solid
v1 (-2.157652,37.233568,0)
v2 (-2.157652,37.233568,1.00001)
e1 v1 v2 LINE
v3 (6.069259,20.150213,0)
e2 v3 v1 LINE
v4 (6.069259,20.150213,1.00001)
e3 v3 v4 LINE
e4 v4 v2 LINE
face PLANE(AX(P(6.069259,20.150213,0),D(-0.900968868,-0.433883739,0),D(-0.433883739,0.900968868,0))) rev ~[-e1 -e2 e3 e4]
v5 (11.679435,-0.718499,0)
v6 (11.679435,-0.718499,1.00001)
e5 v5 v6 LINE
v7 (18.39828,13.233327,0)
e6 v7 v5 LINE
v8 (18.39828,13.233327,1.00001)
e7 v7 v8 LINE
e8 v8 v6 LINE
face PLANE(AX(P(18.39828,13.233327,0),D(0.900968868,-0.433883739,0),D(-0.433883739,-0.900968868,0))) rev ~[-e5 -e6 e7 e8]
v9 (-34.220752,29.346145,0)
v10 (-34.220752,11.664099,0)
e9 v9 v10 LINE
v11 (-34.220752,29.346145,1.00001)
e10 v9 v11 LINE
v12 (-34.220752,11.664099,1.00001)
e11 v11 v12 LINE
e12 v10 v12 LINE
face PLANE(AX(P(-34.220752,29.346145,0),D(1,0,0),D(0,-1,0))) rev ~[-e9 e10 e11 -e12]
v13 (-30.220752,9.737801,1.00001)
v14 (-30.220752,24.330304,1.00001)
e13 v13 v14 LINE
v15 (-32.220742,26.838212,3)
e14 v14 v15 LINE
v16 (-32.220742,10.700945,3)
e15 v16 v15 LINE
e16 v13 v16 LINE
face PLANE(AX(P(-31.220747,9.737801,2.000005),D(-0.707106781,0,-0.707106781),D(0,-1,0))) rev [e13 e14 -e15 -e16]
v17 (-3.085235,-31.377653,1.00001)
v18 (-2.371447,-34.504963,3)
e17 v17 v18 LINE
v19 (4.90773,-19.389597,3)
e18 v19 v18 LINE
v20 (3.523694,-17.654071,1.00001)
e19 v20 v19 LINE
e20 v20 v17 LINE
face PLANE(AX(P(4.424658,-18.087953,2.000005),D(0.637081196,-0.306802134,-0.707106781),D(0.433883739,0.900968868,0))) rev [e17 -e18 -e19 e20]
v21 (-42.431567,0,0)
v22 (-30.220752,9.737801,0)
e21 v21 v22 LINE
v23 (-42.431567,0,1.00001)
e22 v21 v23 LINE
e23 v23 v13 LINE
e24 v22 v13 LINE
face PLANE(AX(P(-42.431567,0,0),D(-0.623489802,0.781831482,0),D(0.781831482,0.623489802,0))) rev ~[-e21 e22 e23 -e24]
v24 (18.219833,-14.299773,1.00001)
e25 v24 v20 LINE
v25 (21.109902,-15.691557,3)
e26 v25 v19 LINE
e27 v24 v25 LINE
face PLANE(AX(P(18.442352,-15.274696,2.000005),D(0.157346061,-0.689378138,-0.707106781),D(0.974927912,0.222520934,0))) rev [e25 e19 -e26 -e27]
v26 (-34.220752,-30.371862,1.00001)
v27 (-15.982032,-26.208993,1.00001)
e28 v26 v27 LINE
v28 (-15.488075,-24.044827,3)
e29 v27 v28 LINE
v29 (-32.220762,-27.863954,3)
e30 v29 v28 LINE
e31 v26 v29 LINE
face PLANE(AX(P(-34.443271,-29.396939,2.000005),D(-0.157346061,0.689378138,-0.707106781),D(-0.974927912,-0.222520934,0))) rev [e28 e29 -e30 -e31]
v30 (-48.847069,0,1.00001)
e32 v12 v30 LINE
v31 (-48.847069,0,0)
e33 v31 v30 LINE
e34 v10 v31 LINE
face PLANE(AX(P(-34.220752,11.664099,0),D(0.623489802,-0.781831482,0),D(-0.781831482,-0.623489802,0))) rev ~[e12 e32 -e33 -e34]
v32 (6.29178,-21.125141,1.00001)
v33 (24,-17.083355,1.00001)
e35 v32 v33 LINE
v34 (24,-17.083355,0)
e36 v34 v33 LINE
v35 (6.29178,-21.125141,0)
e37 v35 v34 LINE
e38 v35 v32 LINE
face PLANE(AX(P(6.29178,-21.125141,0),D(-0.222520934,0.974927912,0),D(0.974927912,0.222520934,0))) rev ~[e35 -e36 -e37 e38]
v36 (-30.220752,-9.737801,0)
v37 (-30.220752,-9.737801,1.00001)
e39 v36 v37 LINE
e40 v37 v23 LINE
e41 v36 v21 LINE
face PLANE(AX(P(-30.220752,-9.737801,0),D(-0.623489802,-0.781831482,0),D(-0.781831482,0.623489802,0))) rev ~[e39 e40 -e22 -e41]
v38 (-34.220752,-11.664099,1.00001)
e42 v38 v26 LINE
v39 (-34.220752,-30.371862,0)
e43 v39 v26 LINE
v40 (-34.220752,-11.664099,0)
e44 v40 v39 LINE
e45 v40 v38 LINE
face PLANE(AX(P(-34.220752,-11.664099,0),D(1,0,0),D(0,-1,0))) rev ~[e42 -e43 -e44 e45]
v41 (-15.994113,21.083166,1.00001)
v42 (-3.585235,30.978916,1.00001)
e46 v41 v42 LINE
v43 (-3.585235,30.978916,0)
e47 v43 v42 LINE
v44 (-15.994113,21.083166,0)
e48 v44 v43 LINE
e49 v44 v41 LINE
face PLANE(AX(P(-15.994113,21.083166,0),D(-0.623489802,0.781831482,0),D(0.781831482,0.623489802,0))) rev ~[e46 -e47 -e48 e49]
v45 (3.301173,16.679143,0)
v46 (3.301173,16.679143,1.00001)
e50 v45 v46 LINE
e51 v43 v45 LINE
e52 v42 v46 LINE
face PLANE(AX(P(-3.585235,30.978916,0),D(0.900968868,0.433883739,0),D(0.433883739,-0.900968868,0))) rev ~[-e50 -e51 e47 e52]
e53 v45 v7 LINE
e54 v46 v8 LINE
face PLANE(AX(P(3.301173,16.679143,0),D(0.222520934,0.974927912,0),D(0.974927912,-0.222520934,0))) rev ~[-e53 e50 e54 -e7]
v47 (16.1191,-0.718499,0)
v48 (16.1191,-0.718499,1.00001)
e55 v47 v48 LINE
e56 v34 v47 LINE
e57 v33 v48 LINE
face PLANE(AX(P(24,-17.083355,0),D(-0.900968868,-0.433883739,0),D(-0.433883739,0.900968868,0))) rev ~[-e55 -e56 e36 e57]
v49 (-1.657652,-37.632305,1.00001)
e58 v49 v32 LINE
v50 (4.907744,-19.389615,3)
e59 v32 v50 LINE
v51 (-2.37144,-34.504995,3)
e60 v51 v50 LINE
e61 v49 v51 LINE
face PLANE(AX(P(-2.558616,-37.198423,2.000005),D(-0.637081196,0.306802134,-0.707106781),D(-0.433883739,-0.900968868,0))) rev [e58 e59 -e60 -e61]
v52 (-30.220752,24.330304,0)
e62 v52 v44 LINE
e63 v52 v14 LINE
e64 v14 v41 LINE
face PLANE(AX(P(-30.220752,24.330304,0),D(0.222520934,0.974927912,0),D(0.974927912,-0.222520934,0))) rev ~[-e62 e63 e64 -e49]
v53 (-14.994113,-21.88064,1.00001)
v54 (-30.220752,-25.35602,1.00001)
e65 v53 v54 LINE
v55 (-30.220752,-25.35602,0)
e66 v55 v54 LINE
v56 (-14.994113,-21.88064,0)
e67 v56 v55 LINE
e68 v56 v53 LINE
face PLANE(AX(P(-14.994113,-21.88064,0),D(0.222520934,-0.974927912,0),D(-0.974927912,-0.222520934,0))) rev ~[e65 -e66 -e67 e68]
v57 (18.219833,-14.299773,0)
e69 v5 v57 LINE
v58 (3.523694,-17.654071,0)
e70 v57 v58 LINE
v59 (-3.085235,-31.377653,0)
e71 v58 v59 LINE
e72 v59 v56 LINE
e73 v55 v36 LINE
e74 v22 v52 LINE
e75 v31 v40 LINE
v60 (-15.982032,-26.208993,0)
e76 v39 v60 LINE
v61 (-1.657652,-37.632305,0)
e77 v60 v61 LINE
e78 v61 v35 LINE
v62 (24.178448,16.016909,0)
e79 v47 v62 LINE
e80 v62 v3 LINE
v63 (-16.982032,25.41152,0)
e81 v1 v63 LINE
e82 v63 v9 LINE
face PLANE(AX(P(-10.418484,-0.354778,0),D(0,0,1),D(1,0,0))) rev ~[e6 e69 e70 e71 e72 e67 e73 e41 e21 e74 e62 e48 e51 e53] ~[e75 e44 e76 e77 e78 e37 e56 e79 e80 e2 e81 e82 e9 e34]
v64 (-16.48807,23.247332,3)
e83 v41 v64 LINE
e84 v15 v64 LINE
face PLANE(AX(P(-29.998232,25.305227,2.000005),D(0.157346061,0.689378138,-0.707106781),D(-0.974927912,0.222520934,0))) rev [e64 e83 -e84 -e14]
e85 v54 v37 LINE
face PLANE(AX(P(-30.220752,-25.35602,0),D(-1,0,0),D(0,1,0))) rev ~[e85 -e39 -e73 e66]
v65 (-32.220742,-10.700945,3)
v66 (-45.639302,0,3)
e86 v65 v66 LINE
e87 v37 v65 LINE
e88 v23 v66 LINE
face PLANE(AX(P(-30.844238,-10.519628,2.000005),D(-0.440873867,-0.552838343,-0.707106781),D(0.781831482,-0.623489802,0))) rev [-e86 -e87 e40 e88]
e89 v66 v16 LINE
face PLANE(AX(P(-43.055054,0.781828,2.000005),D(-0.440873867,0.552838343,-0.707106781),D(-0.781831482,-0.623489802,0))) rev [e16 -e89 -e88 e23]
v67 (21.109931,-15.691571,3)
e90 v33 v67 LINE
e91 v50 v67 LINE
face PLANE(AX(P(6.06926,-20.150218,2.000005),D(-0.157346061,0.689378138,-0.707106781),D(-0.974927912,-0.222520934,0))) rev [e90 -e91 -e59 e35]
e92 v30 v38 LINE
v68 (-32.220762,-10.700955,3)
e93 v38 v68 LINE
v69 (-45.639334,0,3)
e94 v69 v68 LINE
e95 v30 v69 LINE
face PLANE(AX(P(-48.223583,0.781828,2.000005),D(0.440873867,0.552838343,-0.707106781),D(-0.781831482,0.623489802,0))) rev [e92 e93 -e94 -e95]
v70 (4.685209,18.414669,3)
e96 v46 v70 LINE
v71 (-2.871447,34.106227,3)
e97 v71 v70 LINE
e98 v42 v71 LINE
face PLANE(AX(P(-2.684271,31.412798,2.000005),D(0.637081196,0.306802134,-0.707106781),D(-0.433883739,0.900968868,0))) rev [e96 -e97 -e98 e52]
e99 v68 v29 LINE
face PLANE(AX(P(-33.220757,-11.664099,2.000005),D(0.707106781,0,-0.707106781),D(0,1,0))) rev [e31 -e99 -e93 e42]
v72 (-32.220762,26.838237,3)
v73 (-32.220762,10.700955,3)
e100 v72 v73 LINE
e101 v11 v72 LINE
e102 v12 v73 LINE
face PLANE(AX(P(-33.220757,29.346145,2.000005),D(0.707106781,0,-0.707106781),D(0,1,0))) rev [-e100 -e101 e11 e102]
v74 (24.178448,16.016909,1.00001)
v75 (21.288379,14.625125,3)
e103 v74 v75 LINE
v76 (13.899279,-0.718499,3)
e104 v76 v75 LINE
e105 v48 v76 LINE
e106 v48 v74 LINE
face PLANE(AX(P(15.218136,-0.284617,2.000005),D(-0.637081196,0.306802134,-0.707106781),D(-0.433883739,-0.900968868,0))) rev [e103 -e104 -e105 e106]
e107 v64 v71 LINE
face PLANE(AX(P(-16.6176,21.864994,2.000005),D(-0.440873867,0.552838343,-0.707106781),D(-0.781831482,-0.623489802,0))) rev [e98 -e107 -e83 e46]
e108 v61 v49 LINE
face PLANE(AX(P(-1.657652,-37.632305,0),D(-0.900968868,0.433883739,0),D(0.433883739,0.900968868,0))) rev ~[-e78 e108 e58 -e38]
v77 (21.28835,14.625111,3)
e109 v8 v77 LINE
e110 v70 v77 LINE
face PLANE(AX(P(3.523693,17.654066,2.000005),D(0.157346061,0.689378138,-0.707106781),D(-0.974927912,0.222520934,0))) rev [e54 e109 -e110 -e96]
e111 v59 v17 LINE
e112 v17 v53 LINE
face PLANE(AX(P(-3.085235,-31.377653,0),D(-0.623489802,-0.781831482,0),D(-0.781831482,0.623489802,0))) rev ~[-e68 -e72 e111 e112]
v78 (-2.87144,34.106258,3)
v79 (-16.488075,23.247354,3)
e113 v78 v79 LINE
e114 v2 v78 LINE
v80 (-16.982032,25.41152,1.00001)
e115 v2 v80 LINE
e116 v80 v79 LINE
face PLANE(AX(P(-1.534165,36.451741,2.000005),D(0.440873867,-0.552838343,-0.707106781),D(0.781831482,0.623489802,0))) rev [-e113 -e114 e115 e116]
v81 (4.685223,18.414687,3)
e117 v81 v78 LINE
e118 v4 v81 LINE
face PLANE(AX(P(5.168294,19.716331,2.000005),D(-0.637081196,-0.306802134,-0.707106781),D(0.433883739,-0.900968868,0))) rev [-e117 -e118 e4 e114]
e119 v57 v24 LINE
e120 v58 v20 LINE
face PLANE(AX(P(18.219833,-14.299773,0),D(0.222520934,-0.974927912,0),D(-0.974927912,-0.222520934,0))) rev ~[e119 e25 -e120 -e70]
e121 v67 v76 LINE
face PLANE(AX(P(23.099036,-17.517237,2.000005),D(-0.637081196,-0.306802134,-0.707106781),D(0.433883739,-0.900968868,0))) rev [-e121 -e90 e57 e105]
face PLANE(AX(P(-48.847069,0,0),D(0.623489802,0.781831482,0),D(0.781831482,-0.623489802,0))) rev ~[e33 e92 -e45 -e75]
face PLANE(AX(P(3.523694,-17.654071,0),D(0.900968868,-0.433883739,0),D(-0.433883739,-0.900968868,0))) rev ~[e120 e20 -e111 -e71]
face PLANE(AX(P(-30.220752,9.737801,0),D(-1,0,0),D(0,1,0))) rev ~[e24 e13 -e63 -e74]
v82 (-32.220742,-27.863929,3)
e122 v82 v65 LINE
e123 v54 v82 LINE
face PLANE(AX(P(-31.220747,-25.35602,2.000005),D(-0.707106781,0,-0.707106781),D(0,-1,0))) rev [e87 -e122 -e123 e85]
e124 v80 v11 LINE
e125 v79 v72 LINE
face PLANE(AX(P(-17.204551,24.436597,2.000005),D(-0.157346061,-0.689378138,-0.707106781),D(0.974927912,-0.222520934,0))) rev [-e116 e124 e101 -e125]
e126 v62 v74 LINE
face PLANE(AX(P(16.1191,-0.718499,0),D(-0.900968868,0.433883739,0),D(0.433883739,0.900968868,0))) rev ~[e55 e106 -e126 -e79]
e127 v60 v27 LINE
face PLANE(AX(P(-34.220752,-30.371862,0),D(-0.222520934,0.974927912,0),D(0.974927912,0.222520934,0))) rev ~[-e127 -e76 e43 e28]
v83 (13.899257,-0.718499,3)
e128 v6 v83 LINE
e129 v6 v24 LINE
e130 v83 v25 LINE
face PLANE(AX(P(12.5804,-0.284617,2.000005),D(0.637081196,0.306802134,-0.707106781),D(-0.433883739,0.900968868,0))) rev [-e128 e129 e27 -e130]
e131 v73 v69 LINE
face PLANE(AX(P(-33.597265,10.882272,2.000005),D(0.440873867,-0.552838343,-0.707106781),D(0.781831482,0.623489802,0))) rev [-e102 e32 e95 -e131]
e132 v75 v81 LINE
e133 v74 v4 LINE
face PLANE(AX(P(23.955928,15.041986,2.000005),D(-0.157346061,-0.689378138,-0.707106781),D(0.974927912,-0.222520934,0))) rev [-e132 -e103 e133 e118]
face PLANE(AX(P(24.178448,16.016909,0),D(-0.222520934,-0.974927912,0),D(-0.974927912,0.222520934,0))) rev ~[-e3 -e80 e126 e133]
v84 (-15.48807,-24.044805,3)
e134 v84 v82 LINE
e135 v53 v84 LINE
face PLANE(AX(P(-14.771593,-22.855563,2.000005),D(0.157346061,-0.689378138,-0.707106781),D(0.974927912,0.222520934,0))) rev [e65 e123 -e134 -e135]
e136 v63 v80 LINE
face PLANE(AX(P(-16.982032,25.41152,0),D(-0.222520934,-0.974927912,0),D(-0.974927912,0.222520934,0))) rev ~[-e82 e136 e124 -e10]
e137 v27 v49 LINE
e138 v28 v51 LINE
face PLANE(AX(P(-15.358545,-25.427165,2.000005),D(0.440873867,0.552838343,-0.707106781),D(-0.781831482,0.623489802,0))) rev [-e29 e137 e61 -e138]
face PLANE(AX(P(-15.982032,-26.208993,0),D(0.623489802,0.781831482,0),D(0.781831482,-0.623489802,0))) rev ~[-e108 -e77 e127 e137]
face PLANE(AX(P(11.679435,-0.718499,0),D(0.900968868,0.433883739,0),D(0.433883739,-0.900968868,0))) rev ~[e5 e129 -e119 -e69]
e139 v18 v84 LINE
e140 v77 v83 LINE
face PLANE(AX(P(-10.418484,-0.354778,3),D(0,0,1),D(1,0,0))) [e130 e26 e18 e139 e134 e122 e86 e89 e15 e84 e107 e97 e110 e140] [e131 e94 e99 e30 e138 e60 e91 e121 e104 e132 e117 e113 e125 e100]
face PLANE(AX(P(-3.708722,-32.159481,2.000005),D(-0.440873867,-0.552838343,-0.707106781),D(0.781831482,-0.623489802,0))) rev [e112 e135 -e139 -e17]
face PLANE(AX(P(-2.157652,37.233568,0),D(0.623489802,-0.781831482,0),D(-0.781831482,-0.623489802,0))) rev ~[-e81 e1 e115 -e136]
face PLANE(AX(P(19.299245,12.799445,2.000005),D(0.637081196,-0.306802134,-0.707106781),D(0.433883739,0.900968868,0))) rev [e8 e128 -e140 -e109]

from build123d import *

# Parameters (mm, degrees)
F1_DEPTH = 3
F2_SIZE  = 1.99999


# Not quite as in the source:
# - a fillet or chamfer is up to 0.001 mm smaller than in the source, because OpenCascade refuses the exact size


with BuildPart() as f1:
    # F0 (on Top) → F1 (new body)
    with BuildSketch(Plane.XY):
        Polygon((6.0692586303, 20.150212978), (-2.1576516057, 37.2335681107), (-16.982031609, 25.4115195514), (-34.2207515071, 29.346144875), (-34.2207515071, 11.6640991742), (-48.8470692461, 0), (-34.2207515071, -11.6640991742), (-34.2207515071, -30.3718617382), (-15.982031609, -26.2089929403), (-1.6576516057, -37.6323048051), (6.2917795642, -21.1251408902), (24, -17.0833551327), (16.1191004999, -0.7184986964), (24.1784479339, 16.0169086929), align=None)
        Polygon((-42.4315673597, 0), (-30.2207515071, 9.737800699), (-30.2207515071, 24.3303035243), (-15.9941131941, 21.0831661669), (-3.5852350773, 30.9789162509), (3.3011727437, 16.6791430651), (18.3982804623, 13.2333267461), (11.6794354432, -0.7184986964), (18.2198325283, -14.2997731858), (3.5236936777, -17.6540709772), (-3.0852350773, -31.3776529454), (-14.9941131941, -21.8806395557), (-30.2207515071, -25.3560203876), (-30.2207515071, -9.737800699), align=None, mode=Mode.SUBTRACT)
    extrude(amount=F1_DEPTH)

    # F2 (size 2 in the source; OpenCascade refuses exactly that, so slightly less here)
    f2_edges = [f1.edges().sort_by_distance(p)[0] for p in [
        (15.123853, 18.083561, 3),
        (1.955804, 28.691891, 3),
        (-9.569842, 31.322544, 3),
        (-25.601392, 27.378832, 3),
        (-34.220752, 20.505122, 3),
        (-41.53391, 5.83205, 3),
        (-41.53391, -5.83205, 3),
        (-34.220752, -21.01798, 3),
        (-25.101392, -28.290427, 3),
        (-8.819842, -31.920649, 3),
        (2.317064, -29.378723, 3),
        (15.14589, -19.104248, 3),
        (20.05955, -8.900927, 3),
        (20.148774, 7.649205, 3),
        (-9.039674, -26.629146, 3),
        (-22.607432, -23.61833, 3),
        (-30.220752, -17.546911, 3),
        (-36.326159, -4.8689, 3),
        (-36.326159, 4.8689, 3),
        (-30.220752, 17.034052, 3),
        (-23.107432, 22.706735, 3),
        (-9.789674, 26.031041, 3),
        (-0.142031, 23.82903, 3),
        (10.849727, 14.956235, 3),
        (15.038858, 6.257414, 3),
        (14.949634, -7.509136, 3),
        (10.871763, -15.976922, 3),
        (0.219229, -24.515862, 3),
    ]]
    chamfer(f2_edges, length=F2_SIZE)


solid = f1.part
